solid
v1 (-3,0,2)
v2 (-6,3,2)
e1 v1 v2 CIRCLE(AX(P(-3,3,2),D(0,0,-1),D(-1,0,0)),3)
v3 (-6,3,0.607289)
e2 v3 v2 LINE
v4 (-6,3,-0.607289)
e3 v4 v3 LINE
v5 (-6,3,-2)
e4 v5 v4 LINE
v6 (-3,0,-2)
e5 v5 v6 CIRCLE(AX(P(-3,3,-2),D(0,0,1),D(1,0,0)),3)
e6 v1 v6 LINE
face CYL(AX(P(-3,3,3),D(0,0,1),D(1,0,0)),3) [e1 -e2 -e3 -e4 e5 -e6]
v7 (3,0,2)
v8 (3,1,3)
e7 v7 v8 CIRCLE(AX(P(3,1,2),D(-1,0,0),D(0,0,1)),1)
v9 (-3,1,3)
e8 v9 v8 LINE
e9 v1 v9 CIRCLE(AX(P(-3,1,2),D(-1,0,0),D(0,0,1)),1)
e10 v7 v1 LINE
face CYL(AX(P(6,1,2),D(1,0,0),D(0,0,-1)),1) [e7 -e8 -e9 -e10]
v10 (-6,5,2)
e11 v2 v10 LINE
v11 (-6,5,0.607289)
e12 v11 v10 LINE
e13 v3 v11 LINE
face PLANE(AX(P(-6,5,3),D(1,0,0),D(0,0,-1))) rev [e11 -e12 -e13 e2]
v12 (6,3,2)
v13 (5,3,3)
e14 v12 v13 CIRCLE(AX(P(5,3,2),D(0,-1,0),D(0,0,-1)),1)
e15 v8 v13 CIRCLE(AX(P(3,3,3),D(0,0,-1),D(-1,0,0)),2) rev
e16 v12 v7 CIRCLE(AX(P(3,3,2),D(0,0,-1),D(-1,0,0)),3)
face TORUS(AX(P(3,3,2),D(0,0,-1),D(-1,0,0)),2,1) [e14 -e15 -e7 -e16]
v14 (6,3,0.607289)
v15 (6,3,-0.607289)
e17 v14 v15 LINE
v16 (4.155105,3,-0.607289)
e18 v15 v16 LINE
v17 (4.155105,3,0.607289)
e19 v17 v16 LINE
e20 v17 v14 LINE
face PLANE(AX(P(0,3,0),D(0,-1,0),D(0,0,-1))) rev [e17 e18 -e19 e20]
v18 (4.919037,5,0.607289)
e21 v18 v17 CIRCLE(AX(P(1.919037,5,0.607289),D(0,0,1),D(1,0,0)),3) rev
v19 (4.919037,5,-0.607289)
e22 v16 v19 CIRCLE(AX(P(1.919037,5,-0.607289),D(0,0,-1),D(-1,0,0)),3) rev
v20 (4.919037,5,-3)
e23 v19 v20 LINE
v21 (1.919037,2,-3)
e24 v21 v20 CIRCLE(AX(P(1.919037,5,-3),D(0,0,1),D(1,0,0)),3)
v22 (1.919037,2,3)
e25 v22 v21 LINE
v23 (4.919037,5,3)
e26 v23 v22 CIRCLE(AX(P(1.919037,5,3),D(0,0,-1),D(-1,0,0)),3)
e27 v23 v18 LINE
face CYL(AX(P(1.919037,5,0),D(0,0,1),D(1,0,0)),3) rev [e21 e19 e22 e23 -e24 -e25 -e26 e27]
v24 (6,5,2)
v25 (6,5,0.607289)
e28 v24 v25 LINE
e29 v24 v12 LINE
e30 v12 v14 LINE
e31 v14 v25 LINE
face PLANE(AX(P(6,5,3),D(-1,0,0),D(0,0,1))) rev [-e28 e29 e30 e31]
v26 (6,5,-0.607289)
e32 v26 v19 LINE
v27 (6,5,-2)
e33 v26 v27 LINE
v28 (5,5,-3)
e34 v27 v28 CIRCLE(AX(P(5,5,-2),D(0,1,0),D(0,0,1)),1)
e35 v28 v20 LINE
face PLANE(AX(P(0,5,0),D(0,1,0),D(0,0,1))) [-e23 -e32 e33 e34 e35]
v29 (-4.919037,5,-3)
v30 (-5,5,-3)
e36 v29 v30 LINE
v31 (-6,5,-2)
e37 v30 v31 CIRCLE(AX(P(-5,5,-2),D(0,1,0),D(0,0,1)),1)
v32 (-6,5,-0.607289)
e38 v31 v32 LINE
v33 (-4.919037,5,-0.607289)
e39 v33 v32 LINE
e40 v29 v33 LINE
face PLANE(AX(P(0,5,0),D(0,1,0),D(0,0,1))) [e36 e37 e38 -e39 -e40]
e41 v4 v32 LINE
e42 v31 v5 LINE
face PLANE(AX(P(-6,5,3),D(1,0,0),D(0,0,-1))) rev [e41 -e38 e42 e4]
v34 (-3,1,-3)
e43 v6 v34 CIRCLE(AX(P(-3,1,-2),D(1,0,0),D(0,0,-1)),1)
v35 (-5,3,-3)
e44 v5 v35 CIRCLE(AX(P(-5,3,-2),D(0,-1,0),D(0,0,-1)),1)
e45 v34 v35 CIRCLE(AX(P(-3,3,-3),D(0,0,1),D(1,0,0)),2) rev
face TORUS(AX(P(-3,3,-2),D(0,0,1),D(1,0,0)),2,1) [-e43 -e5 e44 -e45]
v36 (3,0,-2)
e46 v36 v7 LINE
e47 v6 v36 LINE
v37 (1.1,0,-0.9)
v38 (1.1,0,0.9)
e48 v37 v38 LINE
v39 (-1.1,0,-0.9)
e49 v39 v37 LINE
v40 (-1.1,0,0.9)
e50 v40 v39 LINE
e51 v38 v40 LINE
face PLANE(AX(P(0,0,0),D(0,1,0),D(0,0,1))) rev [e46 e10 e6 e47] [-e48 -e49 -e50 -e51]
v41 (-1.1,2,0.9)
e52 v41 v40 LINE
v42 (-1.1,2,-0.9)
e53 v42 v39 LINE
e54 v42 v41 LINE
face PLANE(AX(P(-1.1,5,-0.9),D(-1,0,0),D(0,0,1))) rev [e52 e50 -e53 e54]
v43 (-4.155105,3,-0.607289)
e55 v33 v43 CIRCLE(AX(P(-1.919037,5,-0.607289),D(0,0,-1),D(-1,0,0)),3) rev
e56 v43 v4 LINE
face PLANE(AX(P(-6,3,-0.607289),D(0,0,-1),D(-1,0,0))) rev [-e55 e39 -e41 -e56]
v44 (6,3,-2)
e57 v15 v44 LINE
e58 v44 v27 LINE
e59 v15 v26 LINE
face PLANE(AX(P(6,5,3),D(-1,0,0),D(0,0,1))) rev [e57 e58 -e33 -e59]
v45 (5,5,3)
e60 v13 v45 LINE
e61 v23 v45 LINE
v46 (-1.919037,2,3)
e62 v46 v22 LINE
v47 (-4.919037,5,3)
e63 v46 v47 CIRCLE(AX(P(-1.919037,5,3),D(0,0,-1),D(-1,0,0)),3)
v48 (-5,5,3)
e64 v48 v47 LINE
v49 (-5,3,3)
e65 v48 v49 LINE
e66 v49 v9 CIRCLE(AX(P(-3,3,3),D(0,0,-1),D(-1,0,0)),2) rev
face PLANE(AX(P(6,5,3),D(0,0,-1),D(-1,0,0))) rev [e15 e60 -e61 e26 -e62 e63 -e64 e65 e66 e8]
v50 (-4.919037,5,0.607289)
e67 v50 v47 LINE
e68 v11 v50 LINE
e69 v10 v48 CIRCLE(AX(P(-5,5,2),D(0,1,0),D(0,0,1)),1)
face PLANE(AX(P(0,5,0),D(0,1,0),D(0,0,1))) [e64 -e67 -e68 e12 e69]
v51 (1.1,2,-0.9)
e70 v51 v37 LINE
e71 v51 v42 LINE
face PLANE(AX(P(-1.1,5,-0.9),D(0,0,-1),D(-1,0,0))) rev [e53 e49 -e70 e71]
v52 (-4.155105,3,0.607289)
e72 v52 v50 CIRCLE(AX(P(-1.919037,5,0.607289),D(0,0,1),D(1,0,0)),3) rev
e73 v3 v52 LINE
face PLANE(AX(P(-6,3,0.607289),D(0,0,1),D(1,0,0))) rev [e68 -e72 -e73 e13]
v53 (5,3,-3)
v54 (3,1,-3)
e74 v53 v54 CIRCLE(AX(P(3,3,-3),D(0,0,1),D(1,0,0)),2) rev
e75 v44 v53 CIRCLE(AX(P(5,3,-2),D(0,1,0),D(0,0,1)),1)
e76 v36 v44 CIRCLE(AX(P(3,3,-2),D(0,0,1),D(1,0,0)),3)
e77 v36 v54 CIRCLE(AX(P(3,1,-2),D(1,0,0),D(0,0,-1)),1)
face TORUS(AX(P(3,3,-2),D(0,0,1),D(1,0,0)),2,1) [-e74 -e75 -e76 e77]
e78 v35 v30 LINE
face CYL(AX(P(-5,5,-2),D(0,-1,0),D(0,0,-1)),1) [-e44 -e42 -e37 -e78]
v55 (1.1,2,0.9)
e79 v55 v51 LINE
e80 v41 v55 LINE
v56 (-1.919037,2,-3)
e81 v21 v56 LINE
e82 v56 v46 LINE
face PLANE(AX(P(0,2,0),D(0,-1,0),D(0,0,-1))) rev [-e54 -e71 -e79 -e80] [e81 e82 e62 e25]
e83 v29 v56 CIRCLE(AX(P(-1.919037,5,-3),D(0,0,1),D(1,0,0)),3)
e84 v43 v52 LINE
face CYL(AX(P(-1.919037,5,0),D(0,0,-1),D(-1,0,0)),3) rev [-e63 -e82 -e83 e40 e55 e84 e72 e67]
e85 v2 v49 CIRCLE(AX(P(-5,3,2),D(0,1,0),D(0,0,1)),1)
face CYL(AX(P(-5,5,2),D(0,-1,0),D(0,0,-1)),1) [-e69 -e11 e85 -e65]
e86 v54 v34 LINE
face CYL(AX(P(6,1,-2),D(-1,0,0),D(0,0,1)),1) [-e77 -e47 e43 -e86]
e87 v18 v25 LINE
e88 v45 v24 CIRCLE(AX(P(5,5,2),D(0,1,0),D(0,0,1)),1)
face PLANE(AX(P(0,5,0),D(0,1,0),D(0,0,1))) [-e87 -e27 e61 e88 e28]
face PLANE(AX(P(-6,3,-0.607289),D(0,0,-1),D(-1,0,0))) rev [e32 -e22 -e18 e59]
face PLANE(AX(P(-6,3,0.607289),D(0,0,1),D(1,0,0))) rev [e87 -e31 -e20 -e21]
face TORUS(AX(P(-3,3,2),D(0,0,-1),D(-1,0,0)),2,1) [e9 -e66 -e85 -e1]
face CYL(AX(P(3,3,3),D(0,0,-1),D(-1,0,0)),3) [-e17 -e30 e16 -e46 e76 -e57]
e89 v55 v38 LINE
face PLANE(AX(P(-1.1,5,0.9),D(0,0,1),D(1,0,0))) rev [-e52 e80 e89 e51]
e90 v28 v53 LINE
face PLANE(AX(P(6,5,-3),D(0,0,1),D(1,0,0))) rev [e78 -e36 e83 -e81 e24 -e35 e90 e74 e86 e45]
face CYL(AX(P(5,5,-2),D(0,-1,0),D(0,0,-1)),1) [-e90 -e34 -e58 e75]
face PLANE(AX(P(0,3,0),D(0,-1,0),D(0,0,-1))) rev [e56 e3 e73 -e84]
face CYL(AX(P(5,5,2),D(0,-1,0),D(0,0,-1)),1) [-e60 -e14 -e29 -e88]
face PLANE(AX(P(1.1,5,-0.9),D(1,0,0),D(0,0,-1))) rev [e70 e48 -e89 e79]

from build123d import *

# Parameters (mm, degrees)
SKETCH_1_W          = 12
SKETCH_1_H          = 6
EXTRUDE_1_DEPTH     = 5
SKETCH_2_W          = 2.2
SKETCH_2_H          = 1.8
CUT_EXTRUDE_1_DEPTH = 5
FILLET_1_R          = 3
SKETCH_3_W          = 9.838074984
SKETCH_3_H          = 6
CUT_EXTRUDE_2_DEPTH = 3
FILLET_2_R          = 3
FILLET_3_R          = 1
FILLET_4_R          = 1
SKETCH_4_W          = 12
SKETCH_4_H          = 1.214577158
CUT_EXTRUDE_3_DEPTH = 2


with BuildPart() as part:
    # Эскиз1 → Бобышка-Вытянуть1 (new body)
    with BuildSketch(Plane(origin=(0, 0, 0), x_dir=(1, 0, 0), z_dir=(0, 1, 0))):
        Rectangle(SKETCH_1_W, SKETCH_1_H)
    extrude(amount=EXTRUDE_1_DEPTH)

    # Эскиз2 → Вырез-Вытянуть1 (cut)
    with BuildSketch(Plane.XZ):
        Rectangle(SKETCH_2_W, SKETCH_2_H)
    extrude(amount=-CUT_EXTRUDE_1_DEPTH, mode=Mode.SUBTRACT)

    # Скругление1
    fillet_1_edges = [part.edges().sort_by_distance(p)[0] for p in [
        (6, 0, 0),
        (-6, 0, 0),
    ]]
    fillet(fillet_1_edges, radius=FILLET_1_R)

    # Эскиз3 → Вырез-Вытянуть2 (cut)
    with BuildSketch(Plane(origin=(0, 5, 0), x_dir=(1, 0, 0), z_dir=(0, 1, 0))):
        Rectangle(SKETCH_3_W, SKETCH_3_H)
    extrude(amount=-CUT_EXTRUDE_2_DEPTH, mode=Mode.SUBTRACT)

    # Скругление2
    fillet_2_edges = [part.edges().sort_by_distance(p)[0] for p in [
        (4.919037492, 2, 0),
        (-4.919037492, 2, 0),
    ]]
    fillet(fillet_2_edges, radius=FILLET_2_R - 0.0001)  # a hair under: the kernel refuses the full size

    # Скругление3
    fillet_3_edges = [part.edges().sort_by_distance(p)[0] for p in [
        (0, 0, -3),
        (-5.121320344, 0.878679656, -3),
        (5.121320344, 0.878679656, -3),
        (-6, 4, -3),
        (6, 4, -3),
    ]]
    fillet(fillet_3_edges, radius=FILLET_3_R)

    # Скругление4
    fillet_4_edges = [part.edges().sort_by_distance(p)[0] for p in [
        (0, 0, 3),
        (-5.121320344, 0.878679656, 3),
        (5.121320344, 0.878679656, 3),
        (6, 4, 3),
        (-6, 4, 3),
    ]]
    fillet(fillet_4_edges, radius=FILLET_4_R)

    # Эскиз4 → Вырез-Вытянуть3 (cut)
    with BuildSketch(Plane(origin=(0, 5, 0), x_dir=(1, 0, 0), z_dir=(0, 1, 0))):
        Rectangle(SKETCH_4_W, SKETCH_4_H)
    extrude(amount=-CUT_EXTRUDE_3_DEPTH, mode=Mode.SUBTRACT)


solid = part.part
